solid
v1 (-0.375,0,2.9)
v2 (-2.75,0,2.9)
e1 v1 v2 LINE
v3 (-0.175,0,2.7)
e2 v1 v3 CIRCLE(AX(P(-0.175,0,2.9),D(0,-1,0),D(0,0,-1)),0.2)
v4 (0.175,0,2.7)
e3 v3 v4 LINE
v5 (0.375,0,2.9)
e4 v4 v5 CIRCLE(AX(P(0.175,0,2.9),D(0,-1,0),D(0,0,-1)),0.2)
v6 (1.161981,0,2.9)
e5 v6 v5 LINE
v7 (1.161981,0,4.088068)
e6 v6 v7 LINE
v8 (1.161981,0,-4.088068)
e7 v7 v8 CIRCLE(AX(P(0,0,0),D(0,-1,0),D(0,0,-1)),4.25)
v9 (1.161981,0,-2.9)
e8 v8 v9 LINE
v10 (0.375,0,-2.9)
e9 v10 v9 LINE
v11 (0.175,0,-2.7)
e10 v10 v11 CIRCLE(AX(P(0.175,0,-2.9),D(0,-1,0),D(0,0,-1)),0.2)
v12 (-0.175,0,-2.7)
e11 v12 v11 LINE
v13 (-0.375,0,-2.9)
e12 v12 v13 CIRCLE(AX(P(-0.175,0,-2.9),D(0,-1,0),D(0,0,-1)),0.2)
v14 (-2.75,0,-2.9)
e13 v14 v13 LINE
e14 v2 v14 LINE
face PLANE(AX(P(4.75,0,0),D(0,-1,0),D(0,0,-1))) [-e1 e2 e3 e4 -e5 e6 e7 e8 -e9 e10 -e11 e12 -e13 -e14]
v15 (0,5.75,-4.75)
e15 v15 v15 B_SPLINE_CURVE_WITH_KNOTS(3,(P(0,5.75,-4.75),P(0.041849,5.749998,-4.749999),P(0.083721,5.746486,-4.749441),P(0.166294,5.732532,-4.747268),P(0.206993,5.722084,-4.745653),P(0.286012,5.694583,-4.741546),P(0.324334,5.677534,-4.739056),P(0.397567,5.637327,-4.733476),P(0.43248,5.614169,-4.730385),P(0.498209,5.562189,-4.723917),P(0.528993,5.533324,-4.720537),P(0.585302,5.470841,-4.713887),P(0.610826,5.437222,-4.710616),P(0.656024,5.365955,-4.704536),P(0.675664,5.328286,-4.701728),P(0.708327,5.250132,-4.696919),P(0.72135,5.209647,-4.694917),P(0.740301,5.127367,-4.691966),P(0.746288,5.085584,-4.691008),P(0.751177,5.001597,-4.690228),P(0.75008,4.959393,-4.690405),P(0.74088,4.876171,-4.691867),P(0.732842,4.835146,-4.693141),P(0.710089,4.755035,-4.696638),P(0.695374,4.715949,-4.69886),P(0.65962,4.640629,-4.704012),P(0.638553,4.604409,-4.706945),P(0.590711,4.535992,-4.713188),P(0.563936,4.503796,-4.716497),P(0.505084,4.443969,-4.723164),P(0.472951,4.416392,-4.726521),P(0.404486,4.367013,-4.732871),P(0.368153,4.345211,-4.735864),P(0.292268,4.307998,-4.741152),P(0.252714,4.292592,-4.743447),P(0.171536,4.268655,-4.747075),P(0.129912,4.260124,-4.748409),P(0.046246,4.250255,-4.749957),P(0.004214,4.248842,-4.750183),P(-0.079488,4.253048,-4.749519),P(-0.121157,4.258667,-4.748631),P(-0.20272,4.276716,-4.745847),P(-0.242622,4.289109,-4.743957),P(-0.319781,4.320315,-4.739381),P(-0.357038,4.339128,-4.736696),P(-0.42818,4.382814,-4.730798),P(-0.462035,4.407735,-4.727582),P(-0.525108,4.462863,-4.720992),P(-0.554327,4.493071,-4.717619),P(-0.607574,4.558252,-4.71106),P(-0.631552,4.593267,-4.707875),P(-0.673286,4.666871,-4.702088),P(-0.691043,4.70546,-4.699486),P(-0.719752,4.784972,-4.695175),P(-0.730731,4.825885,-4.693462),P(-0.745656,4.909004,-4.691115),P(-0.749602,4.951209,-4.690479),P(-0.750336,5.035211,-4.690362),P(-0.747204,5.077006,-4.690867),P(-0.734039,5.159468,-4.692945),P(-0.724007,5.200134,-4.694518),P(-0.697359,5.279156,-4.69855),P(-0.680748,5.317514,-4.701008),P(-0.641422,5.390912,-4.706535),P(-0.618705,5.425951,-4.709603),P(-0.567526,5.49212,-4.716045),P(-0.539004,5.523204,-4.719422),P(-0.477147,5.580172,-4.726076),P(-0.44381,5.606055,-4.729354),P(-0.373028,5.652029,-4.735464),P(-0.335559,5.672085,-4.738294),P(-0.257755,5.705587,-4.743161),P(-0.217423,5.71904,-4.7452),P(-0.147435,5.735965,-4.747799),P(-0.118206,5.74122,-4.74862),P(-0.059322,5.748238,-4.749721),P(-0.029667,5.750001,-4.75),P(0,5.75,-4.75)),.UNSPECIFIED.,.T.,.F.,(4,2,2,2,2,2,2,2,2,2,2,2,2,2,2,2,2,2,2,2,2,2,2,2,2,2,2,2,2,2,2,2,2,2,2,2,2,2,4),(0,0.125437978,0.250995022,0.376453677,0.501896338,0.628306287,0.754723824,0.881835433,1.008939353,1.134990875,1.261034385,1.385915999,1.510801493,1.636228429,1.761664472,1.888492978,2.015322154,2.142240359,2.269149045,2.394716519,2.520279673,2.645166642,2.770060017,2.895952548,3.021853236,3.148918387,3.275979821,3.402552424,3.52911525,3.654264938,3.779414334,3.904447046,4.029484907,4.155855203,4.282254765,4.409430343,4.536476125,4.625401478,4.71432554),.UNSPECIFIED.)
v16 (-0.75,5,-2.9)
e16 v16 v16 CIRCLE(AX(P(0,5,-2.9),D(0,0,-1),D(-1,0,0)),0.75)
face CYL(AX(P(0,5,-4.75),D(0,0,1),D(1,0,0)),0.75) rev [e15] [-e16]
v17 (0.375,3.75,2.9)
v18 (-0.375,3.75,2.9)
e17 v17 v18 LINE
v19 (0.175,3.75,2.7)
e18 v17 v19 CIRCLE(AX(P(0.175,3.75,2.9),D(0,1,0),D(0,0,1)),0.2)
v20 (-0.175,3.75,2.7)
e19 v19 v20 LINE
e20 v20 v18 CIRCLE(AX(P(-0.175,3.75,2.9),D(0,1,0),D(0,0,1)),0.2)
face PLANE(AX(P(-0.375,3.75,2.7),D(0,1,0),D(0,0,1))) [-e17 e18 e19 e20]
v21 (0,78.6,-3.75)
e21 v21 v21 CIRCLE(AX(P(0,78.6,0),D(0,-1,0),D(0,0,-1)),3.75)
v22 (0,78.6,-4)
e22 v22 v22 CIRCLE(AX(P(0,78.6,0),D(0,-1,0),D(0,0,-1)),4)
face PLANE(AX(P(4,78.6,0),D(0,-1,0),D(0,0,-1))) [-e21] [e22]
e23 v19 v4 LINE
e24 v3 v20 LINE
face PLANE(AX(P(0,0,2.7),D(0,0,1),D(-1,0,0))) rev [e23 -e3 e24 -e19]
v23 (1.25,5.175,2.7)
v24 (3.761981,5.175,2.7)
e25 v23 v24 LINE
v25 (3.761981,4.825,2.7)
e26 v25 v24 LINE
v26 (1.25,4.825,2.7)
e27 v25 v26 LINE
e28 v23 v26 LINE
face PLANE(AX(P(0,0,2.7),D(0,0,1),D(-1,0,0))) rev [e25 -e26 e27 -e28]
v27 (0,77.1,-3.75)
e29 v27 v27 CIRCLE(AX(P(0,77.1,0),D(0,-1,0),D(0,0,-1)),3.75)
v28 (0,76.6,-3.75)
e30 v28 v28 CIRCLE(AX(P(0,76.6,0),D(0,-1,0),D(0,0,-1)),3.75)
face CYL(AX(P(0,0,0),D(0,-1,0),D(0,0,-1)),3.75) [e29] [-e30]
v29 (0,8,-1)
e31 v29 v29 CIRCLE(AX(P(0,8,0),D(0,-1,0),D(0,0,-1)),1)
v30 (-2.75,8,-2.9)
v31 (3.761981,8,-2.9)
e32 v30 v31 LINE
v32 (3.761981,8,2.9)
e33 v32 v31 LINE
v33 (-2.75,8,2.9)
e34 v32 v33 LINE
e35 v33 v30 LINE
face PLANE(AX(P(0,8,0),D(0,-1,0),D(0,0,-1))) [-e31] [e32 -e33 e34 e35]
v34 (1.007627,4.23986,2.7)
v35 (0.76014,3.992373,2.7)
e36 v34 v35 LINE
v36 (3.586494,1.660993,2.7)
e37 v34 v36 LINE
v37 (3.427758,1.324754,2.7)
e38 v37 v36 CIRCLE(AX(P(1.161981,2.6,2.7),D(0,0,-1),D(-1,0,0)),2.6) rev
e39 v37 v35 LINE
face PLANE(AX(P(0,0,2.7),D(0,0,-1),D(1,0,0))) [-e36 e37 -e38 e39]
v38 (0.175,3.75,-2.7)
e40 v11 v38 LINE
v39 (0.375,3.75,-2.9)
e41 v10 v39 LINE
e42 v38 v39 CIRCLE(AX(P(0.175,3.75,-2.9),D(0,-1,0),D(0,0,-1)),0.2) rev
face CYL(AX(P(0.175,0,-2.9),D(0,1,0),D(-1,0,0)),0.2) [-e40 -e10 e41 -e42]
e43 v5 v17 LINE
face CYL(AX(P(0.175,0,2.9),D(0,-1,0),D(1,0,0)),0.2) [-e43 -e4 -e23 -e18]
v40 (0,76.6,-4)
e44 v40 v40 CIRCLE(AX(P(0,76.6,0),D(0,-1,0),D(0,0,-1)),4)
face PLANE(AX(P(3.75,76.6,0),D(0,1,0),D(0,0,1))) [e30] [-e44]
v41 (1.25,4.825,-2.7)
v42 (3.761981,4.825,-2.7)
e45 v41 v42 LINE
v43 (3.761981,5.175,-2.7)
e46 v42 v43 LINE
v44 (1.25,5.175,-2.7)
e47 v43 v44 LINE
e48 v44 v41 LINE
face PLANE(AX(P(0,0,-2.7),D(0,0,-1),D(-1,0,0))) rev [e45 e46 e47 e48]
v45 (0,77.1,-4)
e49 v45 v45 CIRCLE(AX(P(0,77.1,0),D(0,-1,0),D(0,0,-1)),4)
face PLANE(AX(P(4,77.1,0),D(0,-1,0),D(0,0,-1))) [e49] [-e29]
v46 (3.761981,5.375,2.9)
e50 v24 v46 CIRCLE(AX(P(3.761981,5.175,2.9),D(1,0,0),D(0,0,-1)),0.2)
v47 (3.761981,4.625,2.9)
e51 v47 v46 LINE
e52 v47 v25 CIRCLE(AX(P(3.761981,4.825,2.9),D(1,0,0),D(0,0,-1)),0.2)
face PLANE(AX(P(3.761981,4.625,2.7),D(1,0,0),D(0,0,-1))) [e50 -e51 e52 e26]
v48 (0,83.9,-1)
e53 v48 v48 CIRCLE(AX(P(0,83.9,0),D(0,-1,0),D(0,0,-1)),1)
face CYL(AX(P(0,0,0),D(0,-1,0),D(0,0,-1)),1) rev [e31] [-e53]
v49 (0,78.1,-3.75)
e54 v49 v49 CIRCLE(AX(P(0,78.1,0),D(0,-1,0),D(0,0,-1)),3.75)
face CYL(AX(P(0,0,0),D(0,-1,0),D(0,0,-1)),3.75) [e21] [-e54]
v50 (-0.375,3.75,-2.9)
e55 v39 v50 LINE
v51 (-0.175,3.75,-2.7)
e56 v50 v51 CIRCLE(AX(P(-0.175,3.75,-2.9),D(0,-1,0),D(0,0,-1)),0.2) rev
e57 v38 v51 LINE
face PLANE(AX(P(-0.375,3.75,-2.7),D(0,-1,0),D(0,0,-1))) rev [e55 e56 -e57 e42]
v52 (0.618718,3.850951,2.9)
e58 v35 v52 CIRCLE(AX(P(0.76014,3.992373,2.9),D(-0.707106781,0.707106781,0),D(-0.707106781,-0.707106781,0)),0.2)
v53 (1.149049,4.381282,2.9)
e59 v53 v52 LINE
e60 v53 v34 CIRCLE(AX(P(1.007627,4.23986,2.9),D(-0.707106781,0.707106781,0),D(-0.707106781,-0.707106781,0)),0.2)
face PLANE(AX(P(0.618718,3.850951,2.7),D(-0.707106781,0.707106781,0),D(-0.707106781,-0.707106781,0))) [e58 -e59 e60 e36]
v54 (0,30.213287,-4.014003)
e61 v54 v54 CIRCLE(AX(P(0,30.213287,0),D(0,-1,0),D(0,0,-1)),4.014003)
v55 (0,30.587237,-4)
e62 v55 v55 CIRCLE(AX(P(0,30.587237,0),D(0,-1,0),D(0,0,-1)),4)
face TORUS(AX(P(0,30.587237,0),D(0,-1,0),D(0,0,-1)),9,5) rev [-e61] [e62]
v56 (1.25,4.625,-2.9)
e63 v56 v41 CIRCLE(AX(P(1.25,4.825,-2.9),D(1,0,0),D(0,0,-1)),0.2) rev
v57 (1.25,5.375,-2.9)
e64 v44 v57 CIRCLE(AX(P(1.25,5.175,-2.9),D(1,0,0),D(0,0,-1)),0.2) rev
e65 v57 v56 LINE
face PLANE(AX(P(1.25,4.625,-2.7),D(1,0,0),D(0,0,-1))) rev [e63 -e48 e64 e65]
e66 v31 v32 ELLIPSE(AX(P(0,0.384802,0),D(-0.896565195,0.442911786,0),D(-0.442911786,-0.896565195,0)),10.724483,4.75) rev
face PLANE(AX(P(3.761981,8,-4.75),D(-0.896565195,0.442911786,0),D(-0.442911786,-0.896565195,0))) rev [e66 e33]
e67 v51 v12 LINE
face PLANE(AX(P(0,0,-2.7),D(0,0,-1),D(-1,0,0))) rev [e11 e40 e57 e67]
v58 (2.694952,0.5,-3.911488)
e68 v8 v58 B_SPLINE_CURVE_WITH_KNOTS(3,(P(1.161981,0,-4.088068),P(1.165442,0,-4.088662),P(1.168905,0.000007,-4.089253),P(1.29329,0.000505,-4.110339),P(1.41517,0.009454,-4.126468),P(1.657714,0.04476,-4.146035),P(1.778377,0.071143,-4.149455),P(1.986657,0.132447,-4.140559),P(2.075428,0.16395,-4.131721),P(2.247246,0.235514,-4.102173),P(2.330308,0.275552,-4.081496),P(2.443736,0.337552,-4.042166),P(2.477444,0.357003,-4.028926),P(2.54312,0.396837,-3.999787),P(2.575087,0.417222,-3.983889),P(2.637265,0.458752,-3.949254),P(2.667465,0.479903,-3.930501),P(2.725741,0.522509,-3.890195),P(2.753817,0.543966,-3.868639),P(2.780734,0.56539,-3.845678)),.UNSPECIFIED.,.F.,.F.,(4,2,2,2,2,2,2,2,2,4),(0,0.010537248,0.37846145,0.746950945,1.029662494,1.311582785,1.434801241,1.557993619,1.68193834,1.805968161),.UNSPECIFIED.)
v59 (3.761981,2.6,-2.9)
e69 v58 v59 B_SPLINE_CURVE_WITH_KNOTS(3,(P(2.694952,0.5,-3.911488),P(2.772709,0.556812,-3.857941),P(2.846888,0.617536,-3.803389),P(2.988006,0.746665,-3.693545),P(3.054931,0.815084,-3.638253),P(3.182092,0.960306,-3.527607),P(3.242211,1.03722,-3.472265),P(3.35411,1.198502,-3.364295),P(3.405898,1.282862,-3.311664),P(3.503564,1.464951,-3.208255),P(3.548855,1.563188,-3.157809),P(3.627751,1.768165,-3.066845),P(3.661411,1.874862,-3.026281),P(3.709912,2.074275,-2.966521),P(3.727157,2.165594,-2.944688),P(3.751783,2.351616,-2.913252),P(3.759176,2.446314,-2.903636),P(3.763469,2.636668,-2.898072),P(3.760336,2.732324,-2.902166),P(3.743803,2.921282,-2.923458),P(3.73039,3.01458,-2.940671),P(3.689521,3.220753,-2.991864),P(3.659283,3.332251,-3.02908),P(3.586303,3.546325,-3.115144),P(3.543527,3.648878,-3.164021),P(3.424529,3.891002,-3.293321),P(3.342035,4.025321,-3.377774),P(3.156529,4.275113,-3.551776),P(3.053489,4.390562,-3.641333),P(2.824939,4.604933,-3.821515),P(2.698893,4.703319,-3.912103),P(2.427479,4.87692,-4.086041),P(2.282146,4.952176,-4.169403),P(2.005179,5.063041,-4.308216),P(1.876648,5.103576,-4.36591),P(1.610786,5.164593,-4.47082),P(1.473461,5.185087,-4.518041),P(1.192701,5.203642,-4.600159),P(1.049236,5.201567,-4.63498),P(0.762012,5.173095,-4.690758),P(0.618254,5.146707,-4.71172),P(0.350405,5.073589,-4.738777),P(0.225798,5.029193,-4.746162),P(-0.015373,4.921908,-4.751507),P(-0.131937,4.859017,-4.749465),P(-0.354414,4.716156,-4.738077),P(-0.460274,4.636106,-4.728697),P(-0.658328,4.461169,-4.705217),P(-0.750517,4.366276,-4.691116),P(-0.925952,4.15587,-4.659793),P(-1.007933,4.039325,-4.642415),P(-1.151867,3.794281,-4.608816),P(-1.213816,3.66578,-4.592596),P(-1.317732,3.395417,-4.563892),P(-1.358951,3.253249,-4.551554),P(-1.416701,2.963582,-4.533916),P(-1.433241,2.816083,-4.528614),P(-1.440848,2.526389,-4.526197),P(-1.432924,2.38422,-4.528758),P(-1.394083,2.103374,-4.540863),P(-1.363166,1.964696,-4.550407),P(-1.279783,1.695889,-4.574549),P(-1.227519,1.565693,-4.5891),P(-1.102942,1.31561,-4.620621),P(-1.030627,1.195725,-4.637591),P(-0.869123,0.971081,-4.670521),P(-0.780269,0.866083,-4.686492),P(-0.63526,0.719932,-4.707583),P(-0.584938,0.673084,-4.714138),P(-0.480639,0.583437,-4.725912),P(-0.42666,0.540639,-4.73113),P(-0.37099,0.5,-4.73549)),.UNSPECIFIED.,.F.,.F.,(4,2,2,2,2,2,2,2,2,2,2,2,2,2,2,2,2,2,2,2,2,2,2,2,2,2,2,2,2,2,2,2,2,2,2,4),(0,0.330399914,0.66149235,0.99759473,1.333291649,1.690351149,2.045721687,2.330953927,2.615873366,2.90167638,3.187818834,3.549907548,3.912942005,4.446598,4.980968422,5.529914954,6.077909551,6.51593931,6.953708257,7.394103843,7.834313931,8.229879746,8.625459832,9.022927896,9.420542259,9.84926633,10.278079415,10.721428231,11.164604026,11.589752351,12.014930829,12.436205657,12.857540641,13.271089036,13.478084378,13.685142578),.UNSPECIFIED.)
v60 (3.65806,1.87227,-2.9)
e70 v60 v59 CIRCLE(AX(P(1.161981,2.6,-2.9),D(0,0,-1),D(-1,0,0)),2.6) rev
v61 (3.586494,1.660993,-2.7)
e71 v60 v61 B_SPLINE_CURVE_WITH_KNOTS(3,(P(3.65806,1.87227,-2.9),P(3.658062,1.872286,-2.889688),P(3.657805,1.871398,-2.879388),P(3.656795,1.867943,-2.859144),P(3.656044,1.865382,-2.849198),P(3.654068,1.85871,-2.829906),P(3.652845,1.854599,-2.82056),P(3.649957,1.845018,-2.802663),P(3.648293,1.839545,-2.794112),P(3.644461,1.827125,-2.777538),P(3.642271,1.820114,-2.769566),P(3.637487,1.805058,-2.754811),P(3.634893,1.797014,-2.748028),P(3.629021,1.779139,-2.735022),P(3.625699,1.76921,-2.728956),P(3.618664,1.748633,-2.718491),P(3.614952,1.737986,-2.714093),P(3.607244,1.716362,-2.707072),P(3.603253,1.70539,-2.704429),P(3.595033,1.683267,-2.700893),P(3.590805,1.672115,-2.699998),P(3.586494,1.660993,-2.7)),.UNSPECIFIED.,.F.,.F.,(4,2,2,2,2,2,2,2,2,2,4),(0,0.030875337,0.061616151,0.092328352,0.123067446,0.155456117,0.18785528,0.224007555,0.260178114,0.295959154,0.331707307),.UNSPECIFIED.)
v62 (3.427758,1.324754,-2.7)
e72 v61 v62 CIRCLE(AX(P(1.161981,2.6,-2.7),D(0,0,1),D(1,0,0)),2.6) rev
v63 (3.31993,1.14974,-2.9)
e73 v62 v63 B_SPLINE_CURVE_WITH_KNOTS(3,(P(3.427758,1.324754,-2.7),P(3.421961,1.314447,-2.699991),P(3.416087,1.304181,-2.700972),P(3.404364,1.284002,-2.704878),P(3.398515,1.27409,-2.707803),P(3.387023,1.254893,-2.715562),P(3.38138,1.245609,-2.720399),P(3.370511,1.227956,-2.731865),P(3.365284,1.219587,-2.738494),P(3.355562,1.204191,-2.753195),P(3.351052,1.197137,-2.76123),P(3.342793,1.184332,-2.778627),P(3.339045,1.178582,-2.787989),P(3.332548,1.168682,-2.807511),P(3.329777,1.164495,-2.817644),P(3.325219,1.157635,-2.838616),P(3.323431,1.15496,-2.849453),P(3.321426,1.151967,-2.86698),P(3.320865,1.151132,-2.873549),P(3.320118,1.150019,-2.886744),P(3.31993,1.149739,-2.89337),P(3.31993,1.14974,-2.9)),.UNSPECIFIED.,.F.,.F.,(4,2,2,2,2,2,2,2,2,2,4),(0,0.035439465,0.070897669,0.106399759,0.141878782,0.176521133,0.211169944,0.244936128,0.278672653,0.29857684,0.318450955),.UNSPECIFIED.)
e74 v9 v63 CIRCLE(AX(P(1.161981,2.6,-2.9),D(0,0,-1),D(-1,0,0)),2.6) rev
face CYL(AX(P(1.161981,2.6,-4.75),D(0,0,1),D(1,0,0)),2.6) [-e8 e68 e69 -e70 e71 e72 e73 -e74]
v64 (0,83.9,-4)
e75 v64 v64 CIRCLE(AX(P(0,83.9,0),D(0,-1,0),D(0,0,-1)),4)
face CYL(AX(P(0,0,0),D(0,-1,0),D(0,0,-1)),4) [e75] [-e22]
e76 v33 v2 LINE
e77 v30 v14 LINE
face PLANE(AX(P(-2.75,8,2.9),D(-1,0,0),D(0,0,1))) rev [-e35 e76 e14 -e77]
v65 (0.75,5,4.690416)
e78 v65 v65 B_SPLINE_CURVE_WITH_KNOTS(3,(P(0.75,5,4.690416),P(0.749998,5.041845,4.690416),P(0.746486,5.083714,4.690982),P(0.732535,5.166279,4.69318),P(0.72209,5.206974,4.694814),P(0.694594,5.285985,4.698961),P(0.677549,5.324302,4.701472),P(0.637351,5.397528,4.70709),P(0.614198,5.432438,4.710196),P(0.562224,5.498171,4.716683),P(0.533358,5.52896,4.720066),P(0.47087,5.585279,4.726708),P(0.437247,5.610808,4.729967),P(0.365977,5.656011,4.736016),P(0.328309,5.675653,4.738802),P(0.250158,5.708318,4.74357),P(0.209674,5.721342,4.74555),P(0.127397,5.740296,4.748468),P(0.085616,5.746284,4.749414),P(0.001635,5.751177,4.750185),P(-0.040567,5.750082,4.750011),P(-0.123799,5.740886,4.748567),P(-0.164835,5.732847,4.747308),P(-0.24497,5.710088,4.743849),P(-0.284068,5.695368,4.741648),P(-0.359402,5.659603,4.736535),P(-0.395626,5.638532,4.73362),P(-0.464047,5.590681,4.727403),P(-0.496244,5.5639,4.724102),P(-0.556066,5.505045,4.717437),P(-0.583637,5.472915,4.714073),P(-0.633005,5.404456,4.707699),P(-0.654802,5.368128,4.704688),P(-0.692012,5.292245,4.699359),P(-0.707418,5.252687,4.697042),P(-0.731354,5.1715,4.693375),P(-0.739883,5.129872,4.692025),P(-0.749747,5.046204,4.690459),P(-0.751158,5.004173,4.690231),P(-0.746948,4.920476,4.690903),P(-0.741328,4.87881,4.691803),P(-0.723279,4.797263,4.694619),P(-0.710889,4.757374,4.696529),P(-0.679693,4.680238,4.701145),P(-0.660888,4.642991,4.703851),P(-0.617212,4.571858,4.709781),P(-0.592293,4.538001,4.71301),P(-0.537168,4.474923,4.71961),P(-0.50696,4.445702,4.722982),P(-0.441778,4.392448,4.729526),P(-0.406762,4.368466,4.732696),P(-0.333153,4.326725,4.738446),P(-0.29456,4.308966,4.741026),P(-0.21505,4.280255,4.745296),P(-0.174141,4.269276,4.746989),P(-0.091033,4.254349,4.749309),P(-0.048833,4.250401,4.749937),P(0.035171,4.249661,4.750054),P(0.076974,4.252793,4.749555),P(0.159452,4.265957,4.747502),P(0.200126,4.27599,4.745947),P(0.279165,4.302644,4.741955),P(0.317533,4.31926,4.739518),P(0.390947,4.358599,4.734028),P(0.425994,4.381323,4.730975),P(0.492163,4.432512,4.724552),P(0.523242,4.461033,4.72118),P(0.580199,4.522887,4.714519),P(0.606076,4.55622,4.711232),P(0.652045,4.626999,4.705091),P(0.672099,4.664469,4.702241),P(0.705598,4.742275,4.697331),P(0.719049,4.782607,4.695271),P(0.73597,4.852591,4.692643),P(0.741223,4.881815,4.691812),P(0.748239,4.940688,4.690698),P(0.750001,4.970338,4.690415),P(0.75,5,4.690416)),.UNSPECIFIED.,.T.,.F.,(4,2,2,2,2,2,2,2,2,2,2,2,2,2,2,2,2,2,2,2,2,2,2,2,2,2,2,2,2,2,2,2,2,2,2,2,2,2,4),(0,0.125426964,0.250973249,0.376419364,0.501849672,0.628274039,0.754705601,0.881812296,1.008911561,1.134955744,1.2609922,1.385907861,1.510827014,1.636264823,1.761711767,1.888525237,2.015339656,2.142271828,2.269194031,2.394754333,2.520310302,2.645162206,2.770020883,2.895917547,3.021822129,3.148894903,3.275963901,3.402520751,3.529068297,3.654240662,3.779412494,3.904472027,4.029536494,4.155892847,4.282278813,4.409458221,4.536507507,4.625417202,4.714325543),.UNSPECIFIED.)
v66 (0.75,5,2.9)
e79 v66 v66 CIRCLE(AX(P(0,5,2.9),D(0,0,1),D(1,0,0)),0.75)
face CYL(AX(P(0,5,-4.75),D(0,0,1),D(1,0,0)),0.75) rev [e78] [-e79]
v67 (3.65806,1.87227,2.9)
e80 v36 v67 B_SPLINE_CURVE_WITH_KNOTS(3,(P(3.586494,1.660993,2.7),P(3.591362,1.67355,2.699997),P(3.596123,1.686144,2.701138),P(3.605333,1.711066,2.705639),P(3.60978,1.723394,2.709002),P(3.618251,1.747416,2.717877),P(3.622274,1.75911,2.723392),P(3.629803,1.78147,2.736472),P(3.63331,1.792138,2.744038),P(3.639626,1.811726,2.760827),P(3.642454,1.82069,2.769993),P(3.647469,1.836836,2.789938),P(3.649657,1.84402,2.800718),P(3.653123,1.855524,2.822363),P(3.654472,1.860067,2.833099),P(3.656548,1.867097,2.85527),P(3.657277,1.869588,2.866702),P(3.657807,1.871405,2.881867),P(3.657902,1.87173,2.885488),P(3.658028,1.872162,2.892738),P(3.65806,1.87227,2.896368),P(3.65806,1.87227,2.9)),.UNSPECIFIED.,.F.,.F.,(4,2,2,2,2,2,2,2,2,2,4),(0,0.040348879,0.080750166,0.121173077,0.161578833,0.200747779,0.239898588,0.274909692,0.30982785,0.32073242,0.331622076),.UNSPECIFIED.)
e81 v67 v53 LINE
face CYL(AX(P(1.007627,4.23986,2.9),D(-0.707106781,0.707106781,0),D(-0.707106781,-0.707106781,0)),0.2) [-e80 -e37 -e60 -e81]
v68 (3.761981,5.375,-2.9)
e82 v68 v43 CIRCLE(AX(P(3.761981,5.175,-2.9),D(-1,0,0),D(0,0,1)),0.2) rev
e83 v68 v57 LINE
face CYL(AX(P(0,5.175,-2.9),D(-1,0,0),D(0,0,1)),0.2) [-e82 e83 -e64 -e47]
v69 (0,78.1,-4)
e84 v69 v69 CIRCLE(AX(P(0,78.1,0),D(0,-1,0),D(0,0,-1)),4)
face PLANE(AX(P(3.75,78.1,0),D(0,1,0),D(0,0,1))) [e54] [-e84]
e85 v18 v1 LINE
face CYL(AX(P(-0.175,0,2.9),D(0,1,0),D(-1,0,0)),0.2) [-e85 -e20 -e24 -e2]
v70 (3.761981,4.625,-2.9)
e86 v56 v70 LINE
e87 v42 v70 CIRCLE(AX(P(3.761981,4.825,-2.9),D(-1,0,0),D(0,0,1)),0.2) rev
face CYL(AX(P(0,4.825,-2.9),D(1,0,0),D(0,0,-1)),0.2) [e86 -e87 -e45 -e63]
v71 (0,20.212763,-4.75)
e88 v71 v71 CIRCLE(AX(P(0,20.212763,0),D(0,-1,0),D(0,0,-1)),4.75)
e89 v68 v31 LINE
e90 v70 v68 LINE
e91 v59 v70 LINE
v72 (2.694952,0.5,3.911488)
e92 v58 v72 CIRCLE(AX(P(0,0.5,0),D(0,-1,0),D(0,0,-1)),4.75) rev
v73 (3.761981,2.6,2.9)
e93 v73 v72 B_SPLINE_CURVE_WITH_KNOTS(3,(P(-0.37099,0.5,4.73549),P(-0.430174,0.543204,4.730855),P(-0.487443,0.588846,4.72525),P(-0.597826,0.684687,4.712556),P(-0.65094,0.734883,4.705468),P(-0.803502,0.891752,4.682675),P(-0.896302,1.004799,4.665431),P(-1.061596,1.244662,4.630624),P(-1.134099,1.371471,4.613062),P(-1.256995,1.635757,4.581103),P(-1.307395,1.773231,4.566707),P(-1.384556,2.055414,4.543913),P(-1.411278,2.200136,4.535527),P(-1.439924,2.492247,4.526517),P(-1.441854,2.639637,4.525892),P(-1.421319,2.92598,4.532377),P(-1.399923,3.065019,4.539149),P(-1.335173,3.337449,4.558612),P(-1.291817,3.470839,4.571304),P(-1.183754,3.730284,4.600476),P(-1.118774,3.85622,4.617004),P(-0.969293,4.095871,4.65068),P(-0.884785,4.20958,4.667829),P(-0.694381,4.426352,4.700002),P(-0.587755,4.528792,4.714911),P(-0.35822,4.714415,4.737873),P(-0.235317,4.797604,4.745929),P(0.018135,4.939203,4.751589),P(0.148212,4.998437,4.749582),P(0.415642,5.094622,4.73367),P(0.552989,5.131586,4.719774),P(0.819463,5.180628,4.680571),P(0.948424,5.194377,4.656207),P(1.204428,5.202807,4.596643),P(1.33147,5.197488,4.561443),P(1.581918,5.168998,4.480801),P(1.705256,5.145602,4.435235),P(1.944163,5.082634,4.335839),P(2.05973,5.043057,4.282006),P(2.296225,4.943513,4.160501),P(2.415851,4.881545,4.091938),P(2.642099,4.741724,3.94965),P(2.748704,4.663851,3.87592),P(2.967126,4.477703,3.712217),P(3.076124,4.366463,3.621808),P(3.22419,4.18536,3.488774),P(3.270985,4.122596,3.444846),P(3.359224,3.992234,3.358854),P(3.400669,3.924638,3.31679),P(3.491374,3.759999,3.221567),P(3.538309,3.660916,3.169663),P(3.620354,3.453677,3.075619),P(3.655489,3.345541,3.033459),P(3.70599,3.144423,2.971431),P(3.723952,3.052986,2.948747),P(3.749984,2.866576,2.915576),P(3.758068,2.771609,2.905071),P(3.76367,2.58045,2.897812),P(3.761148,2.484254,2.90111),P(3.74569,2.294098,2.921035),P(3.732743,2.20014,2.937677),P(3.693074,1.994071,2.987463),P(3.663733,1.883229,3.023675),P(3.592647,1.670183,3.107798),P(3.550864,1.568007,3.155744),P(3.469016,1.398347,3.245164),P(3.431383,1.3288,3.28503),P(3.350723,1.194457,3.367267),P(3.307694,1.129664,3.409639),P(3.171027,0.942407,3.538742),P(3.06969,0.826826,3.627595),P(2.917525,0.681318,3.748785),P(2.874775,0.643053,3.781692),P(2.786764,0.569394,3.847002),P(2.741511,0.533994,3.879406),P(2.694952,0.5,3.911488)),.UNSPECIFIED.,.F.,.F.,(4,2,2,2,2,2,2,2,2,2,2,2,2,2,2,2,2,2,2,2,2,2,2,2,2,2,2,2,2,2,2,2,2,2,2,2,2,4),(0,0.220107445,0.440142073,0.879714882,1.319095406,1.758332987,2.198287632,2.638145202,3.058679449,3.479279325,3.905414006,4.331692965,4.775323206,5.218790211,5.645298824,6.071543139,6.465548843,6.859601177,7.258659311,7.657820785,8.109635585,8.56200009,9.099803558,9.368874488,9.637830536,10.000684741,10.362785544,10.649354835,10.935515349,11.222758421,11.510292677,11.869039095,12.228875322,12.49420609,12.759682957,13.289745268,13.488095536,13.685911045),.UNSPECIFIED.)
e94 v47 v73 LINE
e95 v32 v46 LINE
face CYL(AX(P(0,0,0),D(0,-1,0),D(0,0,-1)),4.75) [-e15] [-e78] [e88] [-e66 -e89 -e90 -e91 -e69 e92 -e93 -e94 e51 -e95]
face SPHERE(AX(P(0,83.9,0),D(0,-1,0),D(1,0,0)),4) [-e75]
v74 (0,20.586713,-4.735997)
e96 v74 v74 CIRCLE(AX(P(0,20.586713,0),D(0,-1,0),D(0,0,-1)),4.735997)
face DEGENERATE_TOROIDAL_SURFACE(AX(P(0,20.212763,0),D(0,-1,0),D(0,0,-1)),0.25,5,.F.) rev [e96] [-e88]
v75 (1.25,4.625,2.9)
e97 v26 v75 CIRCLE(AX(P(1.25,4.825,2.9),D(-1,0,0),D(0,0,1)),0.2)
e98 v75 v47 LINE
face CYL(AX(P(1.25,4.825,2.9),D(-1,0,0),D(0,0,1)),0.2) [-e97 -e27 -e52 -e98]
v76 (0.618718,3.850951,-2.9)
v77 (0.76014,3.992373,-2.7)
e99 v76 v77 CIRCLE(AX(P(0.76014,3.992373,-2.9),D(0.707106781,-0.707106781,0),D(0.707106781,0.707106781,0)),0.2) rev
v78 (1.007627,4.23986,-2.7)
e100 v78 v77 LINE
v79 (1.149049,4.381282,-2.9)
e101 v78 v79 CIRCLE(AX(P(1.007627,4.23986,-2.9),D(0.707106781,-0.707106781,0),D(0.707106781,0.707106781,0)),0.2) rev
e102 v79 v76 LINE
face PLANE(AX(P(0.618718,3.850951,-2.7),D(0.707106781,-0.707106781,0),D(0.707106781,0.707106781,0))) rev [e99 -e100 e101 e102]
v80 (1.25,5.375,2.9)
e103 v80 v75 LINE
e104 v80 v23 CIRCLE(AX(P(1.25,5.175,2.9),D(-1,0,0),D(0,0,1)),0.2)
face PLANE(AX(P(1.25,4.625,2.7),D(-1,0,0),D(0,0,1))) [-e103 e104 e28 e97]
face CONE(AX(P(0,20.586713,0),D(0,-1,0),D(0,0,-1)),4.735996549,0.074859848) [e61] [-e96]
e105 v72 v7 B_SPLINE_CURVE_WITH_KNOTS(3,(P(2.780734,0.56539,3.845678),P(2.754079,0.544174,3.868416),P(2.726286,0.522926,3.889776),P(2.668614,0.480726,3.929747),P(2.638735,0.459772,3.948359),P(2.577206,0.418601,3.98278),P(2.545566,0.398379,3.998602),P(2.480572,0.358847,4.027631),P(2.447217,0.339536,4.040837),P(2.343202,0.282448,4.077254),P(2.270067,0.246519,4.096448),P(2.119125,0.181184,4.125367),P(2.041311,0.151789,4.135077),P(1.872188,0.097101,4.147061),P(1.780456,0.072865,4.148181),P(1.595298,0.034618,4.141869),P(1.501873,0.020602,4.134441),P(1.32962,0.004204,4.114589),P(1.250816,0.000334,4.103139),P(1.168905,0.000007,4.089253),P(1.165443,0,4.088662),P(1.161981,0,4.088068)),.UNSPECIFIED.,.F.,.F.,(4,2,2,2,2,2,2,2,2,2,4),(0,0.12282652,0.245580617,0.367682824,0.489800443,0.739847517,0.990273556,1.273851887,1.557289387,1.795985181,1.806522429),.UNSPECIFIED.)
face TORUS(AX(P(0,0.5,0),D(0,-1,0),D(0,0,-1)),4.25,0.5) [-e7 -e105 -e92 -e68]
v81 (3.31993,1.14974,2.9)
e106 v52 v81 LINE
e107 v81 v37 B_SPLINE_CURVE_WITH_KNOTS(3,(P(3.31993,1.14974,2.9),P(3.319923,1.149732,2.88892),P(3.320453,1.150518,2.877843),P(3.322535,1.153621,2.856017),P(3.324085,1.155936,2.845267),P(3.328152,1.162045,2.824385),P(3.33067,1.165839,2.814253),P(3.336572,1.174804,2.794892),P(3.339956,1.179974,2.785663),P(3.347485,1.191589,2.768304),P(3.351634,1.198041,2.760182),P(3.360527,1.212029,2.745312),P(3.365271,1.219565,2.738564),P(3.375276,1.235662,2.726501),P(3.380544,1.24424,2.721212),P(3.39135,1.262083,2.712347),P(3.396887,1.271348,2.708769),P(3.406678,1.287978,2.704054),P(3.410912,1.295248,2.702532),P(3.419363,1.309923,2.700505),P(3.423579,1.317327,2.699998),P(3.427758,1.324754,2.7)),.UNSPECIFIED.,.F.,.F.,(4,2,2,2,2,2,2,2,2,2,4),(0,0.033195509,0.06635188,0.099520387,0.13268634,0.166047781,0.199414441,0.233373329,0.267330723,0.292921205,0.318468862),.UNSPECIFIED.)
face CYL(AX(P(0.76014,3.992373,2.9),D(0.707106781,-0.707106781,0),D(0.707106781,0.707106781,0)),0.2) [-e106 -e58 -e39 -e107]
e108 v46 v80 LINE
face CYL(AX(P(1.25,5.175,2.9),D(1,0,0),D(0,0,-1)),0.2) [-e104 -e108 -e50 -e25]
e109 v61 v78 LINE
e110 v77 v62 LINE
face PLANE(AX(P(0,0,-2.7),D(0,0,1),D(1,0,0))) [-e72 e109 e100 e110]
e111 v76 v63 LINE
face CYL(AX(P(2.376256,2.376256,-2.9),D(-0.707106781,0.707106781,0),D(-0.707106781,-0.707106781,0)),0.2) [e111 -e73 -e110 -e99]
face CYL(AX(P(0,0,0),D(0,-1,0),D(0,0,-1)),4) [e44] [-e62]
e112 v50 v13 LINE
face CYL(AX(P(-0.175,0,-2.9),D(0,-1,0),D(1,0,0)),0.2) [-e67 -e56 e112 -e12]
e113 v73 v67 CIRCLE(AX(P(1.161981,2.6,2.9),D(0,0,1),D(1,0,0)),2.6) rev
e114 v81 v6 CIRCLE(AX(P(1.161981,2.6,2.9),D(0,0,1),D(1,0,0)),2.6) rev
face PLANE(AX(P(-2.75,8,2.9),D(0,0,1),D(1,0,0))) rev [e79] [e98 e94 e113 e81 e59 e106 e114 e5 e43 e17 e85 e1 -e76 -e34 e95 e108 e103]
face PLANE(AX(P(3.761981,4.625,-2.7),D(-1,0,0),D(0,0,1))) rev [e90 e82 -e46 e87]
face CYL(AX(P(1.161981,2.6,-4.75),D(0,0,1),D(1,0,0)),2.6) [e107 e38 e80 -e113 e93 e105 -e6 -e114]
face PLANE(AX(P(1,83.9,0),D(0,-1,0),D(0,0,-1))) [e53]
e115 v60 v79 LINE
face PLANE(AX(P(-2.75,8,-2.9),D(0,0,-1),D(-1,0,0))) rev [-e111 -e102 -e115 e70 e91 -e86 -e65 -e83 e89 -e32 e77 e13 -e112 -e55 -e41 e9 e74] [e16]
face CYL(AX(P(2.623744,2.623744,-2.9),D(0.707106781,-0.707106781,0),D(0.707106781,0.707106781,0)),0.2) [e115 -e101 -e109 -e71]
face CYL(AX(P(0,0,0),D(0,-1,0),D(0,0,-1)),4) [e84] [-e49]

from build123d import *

# Parameters (mm, degrees)
ESQUISSE3_W                  = 7.5
ESQUISSE3_H                  = 5.8
ENL_V_MAT_EXTRU_1_DEPTH      = 8
CONG_1_R                     = 0.5
ENL_V_MAT_EXTRU_2_DEPTH      = 89.156310052
ENL_V_MAT_EXTRU_2_DEPTH_BACK = 89.156310052
ESQUISSE4_R                  = 0.75
ESQUISSE5_W                  = 0.75
ESQUISSE5_H                  = 3.75
ESQUISSE5_W_2                = 2.511980861
ESQUISSE5_H_2                = 0.75
BOSS_EXTRU_1_DEPTH           = 0.2
CONG_2_R                     = 0.2
CONG_2_OF_SYM_TRIE1_R        = 0.2
ENL_V_MAT_EXTRU_3_DEPTH      = 89.360030571


with BuildPart() as part:
    # Esquisse2 → Révolution1 (revolve)
    with BuildSketch(Plane.XY, mode=Mode.PRIVATE) as r_volution1_sk:
        with BuildLine():
            Line((4.014003451, 30.213287326), (4.735996549, 20.586712674))
            ThreePointArc((4.735996549, 20.586712674), (4.746497911, 20.399868856), (4.75, 20.212762933))
            Line((4.75, 20.212762933), (4.75, 0))
            Line((4.75, 0), (1, 0))
            Line((1, 0), (1, 83.9))
            Line((1, 83.9), (0, 83.9))
            Line((0, 83.9), (0, 87.9))
            ThreePointArc((0, 87.9), (2.828427125, 86.728427125), (4, 83.9))
            Line((4, 83.9), (4, 78.6))
            Line((4, 78.6), (3.75, 78.6))
            Line((3.75, 78.6), (3.75, 78.1))
            Line((3.75, 78.1), (4, 78.1))
            Line((4, 78.1), (4, 77.1))
            Line((4, 77.1), (3.75, 77.1))
            Line((3.75, 77.1), (3.75, 76.6))
            Line((3.75, 76.6), (4, 76.6))
            Line((4, 76.6), (4, 30.587237067))
            ThreePointArc((4, 30.587237067), (4.003502089, 30.400131144), (4.014003451, 30.213287326))
        make_face()
    revolve(r_volution1_sk.sketch.rotate(Axis((0, 0, 0), (0, 1, 0)), 90), axis=Axis((0, 0, 0), (0, 1, 0)))

    # Esquisse3 → Enlèv. mat.-Extru.1 (cut)
    with BuildSketch(Plane.XZ):
        with Locations((1, 0)):
            Rectangle(ESQUISSE3_W, ESQUISSE3_H)
    extrude(amount=-ENL_V_MAT_EXTRU_1_DEPTH, mode=Mode.SUBTRACT)

    # Congé1
    cong_1_edges = [part.edges().sort_by_distance(p)[0] for p in [
        (-4.262481672, 0, 2.096127382),
    ]]
    fillet(cong_1_edges, radius=CONG_1_R)

    # Esquisse4 → Enlèv. mat.-Extru.2 (cut, two sides: drawn at the far end of the back side and taken through both)
    with BuildSketch(Plane.XY.offset(-ENL_V_MAT_EXTRU_2_DEPTH_BACK)):
        with Locations(Location((0, 5, 0), (0, 0, 90))):
            Circle(ESQUISSE4_R)
        with BuildLine():
            Line((1.161980861, 0), (3.761980861, 0))
            Line((3.761980861, 0), (3.761980861, 2.6))
            ThreePointArc((3.761980861, 2.6), (3.000458492, 0.761522369), (1.161980861, 0))
        make_face()
        Polygon((3.761980861, 8), (4.75, 10), (4.75, 8), align=None)
    extrude(amount=ENL_V_MAT_EXTRU_2_DEPTH + ENL_V_MAT_EXTRU_2_DEPTH_BACK, mode=Mode.SUBTRACT)

    # Esquisse5 → Boss.-Extru.1 (add)
    with BuildSketch(Plane.XY.offset(-2.9)):
        with Locations((0, 1.875)):
            Rectangle(ESQUISSE5_W, ESQUISSE5_H)
        Polygon((0.618718434, 3.850951481), (1.149048519, 4.381281566), (4.027145904, 1.503184182), (3.496815818, 0.972854096), align=None)
        with Locations((2.50599043, 5)):
            Rectangle(ESQUISSE5_W_2, ESQUISSE5_H_2)
    boss_extru_1 = extrude(amount=BOSS_EXTRU_1_DEPTH)

    # Congé2
    cong_2_edges = [part.edges().sort_by_distance(p)[0] for p in [
        (2.505990431, 5.375, -2.7),
        (2.505990431, 4.625, -2.7),
        (2.588097212, 2.942232874, -2.7),
        (2.057767126, 2.411902788, -2.7),
        (-0.375, 1.875, -2.7),
        (0.375, 1.875, -2.7),
    ]]
    fillet(cong_2_edges, radius=CONG_2_R - 0.0001)  # a hair under: the kernel refuses the full size

    # Symétrie1: Boss.-Extru.1 across plane
    add(boss_extru_1.mirror(Plane.XY))

    # Congé2 of Symétrie1
    cong_2_of_sym_trie1_edges = [part.edges().sort_by_distance(p)[0] for p in [
        (2.505990431, 5.375, 2.7),
        (2.505990431, 4.625, 2.7),
        (2.588097212, 2.942232874, 2.7),
        (2.057767126, 2.411902788, 2.7),
        (-0.375, 1.875, 2.7),
        (0.375, 1.875, 2.7),
    ]]
    fillet(cong_2_of_sym_trie1_edges, radius=CONG_2_OF_SYM_TRIE1_R - 0.0001)  # a hair under: the kernel refuses the full size

    # Esquisse6 → Enlèv. mat.-Extru.3 (cut, through all)
    with BuildSketch(Plane.XY.offset(2.9)):
        with BuildLine():
            Line((4.027145904, 1.503184182), (3.658059706, 1.87227038))
            ThreePointArc((3.658059706, 1.87227038), (3.516870908, 1.49795968), (3.319930166, 1.149739748))
            Line((3.319930166, 1.149739748), (3.496815818, 0.972854096))
            Line((3.496815818, 0.972854096), (4.027145904, 1.503184182))
        make_face()
    extrude(amount=-ENL_V_MAT_EXTRU_3_DEPTH, mode=Mode.SUBTRACT)


solid = part.part
